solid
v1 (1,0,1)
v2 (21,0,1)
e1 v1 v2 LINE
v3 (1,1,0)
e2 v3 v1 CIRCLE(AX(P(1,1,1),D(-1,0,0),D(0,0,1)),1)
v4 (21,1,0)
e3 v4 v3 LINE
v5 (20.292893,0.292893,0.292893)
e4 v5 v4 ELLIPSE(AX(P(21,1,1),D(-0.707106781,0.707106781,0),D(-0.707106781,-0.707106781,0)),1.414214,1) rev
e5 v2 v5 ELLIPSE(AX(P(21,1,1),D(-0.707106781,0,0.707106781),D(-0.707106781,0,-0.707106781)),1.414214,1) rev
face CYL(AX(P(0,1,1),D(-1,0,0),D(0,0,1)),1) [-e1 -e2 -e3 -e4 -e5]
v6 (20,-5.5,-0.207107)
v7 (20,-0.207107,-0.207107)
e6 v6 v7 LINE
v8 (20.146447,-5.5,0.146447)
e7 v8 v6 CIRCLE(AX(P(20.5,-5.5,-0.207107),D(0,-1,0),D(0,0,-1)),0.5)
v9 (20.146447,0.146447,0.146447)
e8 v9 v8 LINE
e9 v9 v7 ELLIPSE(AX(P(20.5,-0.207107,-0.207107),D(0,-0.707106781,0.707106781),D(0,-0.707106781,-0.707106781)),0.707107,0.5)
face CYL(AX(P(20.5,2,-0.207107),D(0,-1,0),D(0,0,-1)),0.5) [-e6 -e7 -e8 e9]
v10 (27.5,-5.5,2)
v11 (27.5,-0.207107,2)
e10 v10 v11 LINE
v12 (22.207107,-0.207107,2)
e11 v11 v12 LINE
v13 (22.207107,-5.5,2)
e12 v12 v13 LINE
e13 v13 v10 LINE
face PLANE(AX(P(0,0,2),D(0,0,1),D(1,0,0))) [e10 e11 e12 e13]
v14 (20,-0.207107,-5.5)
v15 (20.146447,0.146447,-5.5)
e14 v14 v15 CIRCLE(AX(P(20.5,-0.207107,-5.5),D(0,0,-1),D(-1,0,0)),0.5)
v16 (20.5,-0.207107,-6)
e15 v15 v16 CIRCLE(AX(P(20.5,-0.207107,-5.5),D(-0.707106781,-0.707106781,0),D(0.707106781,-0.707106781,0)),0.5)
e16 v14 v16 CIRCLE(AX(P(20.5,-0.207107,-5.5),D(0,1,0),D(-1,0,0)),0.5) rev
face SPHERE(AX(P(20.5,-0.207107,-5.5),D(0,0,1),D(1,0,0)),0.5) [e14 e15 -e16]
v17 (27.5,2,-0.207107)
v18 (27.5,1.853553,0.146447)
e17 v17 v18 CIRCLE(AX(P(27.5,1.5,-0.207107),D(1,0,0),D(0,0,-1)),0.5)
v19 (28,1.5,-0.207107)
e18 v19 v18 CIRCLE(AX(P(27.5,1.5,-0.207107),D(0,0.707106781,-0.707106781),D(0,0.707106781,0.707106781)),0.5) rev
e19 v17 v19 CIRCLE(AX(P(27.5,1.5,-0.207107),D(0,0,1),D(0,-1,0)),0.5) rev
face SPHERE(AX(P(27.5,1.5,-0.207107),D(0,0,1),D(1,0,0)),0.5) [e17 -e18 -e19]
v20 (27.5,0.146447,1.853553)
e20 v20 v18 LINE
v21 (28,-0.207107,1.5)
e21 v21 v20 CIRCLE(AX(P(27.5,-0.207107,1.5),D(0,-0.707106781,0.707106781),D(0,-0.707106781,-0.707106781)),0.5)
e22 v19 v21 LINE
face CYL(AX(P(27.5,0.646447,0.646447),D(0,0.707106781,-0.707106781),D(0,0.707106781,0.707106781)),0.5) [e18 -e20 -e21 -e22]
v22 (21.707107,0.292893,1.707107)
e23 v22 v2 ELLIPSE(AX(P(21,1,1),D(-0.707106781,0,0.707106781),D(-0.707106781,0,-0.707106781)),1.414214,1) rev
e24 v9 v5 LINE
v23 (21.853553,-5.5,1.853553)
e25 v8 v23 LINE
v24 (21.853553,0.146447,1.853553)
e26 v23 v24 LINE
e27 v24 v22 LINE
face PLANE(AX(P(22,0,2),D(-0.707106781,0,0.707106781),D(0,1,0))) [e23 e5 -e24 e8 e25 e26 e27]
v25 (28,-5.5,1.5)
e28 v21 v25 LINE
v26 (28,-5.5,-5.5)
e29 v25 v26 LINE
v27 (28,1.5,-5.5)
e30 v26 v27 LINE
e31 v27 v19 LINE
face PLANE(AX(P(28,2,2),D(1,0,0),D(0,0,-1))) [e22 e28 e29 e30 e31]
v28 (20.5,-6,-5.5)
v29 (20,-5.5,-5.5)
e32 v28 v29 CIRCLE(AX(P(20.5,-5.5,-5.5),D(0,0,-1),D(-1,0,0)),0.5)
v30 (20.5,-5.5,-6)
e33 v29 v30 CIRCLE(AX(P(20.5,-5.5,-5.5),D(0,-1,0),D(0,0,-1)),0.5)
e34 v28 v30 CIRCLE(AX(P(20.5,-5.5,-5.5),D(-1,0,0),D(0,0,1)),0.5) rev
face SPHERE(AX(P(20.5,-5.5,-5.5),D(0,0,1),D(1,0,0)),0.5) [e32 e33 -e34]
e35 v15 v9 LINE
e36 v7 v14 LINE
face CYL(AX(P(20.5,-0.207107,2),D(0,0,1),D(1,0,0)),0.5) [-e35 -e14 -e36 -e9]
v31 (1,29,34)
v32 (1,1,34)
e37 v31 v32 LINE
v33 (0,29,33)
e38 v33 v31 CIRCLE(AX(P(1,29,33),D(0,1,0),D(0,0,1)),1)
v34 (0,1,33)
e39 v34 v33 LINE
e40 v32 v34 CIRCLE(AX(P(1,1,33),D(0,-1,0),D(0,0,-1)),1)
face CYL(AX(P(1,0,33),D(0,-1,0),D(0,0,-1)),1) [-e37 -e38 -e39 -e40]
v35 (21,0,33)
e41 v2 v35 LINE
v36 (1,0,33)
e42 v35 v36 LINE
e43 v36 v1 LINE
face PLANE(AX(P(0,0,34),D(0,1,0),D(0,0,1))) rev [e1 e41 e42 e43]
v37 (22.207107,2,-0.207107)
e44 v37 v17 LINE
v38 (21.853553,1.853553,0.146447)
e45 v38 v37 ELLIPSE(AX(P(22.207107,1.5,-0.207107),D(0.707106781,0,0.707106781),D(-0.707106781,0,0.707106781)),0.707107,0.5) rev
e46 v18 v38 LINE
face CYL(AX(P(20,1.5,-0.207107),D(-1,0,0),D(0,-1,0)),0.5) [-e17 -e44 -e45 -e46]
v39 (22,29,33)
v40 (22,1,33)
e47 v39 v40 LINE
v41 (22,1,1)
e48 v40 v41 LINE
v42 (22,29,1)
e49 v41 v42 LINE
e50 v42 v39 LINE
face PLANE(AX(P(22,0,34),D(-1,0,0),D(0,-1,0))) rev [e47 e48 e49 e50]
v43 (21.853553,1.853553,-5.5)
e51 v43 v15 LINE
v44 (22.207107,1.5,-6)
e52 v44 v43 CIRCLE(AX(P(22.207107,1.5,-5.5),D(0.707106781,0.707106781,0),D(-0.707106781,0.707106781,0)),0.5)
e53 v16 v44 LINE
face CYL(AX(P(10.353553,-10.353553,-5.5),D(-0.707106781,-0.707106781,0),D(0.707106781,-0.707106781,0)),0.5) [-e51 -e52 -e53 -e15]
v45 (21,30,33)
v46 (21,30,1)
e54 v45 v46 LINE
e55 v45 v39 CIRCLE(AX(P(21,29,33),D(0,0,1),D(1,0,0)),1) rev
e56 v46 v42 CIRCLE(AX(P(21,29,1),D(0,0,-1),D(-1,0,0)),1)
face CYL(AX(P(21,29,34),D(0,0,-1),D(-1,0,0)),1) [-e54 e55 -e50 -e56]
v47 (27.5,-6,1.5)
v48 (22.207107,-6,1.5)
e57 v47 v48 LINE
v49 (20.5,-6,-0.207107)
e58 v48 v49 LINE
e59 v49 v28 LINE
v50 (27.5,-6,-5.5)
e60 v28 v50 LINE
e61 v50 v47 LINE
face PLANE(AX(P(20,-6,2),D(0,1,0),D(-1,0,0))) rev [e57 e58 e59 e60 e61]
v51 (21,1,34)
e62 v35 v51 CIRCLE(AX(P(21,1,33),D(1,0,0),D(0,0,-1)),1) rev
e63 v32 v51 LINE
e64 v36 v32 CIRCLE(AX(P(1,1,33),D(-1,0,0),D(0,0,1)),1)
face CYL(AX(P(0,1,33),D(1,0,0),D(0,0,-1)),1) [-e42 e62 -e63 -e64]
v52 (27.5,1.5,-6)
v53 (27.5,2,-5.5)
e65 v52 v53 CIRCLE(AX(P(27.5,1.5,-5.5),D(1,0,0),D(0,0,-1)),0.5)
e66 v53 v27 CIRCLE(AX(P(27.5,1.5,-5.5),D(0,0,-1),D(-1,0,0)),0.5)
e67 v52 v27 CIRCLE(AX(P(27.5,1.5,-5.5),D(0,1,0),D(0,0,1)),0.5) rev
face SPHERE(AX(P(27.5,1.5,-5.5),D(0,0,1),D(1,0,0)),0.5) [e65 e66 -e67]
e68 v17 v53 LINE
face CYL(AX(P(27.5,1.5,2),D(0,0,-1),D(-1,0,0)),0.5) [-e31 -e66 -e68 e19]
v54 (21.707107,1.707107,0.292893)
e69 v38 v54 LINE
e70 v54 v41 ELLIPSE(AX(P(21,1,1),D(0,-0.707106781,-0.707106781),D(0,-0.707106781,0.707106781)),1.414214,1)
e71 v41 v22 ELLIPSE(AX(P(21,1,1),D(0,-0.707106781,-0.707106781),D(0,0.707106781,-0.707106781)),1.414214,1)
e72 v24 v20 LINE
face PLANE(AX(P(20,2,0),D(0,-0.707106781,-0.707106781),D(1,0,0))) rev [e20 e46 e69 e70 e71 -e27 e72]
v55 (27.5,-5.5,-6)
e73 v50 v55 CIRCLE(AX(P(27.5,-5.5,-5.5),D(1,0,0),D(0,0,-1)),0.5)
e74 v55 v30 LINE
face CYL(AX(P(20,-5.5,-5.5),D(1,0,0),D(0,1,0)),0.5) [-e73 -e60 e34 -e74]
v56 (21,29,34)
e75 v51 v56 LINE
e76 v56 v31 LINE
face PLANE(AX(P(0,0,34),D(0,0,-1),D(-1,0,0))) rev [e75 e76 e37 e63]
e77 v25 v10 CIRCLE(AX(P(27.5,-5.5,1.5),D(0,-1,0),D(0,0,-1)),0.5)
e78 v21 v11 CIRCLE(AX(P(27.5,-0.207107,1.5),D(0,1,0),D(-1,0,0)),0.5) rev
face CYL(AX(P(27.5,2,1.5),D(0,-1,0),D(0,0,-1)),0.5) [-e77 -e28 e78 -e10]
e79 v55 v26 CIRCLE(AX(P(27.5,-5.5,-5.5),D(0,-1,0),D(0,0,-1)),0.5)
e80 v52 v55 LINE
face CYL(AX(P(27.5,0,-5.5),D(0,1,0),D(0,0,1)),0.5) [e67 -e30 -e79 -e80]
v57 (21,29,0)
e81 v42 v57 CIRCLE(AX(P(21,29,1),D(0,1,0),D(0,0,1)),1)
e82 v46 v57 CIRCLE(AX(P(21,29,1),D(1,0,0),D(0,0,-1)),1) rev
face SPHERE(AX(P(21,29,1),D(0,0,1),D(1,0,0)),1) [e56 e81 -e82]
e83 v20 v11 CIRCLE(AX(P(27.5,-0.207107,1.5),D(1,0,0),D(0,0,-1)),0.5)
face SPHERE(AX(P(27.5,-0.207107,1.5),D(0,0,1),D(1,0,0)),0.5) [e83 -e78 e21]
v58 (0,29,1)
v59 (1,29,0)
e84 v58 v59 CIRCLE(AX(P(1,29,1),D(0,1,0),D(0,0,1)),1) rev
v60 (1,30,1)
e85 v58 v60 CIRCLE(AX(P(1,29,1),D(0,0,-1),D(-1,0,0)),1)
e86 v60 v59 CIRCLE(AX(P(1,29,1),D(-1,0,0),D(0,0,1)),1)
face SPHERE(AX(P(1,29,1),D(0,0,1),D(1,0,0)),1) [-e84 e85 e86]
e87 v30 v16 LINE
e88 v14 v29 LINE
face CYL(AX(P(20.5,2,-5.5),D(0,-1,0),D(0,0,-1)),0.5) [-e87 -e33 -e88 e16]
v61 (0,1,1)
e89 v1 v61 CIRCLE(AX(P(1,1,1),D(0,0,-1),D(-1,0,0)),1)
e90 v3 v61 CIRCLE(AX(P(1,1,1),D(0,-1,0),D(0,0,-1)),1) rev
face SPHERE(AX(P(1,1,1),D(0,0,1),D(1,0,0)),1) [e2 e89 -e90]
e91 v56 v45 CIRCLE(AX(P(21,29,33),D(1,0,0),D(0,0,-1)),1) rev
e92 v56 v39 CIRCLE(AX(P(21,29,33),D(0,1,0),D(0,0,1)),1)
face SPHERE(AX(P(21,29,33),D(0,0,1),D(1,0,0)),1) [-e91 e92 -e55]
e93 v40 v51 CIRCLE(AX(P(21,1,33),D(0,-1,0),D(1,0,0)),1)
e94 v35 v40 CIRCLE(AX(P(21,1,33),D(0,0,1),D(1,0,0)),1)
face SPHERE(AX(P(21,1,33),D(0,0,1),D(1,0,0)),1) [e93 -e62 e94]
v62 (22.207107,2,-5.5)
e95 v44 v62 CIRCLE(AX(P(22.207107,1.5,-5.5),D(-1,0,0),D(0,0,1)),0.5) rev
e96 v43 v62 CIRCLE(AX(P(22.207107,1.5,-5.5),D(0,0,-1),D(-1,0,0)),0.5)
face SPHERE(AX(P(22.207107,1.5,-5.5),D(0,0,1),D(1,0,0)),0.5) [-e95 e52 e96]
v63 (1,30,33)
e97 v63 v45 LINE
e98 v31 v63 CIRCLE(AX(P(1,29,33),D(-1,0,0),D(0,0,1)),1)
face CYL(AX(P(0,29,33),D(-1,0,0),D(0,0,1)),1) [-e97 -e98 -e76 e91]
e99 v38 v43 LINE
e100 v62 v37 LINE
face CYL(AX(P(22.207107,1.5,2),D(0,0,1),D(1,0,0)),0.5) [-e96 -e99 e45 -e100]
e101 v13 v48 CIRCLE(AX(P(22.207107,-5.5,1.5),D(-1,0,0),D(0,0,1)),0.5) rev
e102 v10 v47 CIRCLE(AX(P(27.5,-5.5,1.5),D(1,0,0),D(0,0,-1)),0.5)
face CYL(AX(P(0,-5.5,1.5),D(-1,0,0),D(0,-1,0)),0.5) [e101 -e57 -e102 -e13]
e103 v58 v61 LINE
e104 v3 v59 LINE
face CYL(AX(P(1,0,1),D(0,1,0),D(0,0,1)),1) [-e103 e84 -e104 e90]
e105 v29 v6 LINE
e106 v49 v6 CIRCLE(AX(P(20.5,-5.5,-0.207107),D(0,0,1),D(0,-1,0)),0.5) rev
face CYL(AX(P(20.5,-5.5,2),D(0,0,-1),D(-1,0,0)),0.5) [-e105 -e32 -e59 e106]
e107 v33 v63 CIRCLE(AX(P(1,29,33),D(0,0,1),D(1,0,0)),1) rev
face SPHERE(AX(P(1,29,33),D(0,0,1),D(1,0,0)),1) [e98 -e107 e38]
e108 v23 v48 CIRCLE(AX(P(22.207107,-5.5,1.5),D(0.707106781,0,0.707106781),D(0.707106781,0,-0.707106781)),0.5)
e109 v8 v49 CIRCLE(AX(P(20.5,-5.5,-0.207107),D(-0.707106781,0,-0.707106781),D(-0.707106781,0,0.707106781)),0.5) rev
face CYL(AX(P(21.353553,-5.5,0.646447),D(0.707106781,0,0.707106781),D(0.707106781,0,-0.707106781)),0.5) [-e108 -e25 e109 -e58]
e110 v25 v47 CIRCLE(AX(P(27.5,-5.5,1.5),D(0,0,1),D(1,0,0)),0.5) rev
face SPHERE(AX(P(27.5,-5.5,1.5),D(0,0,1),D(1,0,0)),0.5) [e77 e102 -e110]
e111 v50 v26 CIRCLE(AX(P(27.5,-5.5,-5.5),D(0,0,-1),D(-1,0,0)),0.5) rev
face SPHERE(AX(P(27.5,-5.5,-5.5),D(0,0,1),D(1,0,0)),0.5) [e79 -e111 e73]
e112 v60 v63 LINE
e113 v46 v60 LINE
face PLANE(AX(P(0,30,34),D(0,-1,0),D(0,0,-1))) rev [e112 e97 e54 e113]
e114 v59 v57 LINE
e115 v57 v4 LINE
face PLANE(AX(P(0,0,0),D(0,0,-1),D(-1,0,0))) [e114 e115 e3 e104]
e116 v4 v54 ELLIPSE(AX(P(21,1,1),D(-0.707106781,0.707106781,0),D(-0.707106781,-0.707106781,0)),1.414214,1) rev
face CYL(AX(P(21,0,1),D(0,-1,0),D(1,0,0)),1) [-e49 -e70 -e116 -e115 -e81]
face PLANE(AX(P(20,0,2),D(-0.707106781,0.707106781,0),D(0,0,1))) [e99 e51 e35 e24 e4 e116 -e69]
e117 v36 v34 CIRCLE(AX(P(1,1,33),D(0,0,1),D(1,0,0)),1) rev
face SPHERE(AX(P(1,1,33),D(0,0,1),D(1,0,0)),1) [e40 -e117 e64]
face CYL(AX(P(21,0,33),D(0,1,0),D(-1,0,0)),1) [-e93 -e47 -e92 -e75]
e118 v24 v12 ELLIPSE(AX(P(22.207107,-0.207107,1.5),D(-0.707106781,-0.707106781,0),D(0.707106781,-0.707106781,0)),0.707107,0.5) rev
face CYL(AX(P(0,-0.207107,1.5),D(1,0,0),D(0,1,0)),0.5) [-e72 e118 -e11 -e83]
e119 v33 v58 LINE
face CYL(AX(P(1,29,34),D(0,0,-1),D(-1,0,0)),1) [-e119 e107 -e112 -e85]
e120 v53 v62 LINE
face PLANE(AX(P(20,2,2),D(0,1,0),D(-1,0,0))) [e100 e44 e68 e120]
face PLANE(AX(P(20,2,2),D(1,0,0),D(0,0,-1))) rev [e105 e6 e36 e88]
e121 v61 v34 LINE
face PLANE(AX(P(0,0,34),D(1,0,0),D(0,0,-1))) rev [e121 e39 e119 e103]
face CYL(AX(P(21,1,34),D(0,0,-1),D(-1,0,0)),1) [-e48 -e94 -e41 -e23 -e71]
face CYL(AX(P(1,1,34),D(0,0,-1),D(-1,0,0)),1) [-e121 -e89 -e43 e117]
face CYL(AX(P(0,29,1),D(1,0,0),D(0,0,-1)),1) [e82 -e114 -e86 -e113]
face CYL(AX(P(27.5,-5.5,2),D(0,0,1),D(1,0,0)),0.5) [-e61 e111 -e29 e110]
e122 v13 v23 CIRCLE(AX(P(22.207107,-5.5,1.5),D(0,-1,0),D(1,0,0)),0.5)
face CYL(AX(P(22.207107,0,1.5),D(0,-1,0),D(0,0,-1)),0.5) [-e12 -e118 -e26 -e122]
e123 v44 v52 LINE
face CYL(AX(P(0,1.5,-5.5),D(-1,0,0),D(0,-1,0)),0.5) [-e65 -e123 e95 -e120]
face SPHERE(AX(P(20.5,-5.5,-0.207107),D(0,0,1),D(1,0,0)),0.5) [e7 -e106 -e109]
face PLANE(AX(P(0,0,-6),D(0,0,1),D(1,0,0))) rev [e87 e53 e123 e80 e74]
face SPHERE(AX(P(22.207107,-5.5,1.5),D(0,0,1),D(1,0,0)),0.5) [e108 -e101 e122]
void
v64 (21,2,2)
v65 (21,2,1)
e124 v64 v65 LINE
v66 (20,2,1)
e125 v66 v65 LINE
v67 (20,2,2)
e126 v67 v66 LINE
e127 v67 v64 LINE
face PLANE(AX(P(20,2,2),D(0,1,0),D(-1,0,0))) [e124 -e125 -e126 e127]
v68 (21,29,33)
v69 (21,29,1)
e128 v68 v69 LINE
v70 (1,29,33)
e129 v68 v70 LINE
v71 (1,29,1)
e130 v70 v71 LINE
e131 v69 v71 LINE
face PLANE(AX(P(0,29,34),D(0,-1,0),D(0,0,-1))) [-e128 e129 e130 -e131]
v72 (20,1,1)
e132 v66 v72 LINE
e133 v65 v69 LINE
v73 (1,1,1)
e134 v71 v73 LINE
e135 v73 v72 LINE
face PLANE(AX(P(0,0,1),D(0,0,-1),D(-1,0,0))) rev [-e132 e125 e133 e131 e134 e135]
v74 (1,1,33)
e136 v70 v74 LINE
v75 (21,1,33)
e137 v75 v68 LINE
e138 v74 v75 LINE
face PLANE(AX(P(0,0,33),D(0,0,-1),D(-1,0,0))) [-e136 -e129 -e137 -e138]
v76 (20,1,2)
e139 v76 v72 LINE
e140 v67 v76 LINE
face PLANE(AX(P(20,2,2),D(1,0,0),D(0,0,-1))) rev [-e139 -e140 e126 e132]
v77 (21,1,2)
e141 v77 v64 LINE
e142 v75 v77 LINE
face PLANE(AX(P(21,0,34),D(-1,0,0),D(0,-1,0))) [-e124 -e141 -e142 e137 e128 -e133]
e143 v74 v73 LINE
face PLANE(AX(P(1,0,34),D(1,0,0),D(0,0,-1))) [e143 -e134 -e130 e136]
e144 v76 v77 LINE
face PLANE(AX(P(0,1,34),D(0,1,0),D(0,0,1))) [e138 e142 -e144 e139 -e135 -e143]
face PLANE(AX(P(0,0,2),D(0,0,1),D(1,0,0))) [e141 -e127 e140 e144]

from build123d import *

# Parameters (mm, degrees)
SKETCH1_W                = 22
SKETCH1_H                = 30
BOSS_EXTRUDE1_DEPTH      = 34
SHELL1_T                 = 1
BOSS_EXTRUDE3_DEPTH      = 6
BOSS_EXTRUDE3_DEPTH_BACK = 2
SKETCH2_W                = 8
SKETCH2_H                = 8
CHAMFER2_SIZE            = 2
FILLET1_R                = 1
FILLET2_R                = 0.5


with BuildPart() as part:
    # Sketch1 → Boss-Extrude1 (new body)
    with BuildSketch(Plane.XY):
        with Locations((11, 15)):
            Rectangle(SKETCH1_W, SKETCH1_H)
    extrude(amount=BOSS_EXTRUDE1_DEPTH)

    # Shell1 (no face opened: a closed hollow body)
    add(offset(amount=-SHELL1_T, mode=Mode.PRIVATE), mode=Mode.SUBTRACT)

    # Sketch2 → Boss-Extrude3 (add, two sides: drawn at the far end of the back side and taken through both)
    with BuildSketch(Plane(origin=(0, 0, 0), x_dir=(-1, 0, 0), z_dir=(0, 0, -1)).offset(-BOSS_EXTRUDE3_DEPTH_BACK)):
        with Locations((-24, -2)):
            Rectangle(SKETCH2_W, SKETCH2_H)
    extrude(amount=BOSS_EXTRUDE3_DEPTH + BOSS_EXTRUDE3_DEPTH_BACK)

    # Chamfer2
    chamfer2_edges = [part.edges().sort_by_distance(p)[0] for p in [
        (20, -3, 2),
        (20, 2, -3),
        (25, 2, 2),
    ]]
    chamfer(chamfer2_edges, length=CHAMFER2_SIZE)

    # Fillet1
    # the kernel refuses this fillet: 1 mm, written as the material it takes off along each edge
    with BuildSketch(Plane(origin=(1, 29, 1), x_dir=(0, 1, 0), z_dir=(0, 0, -1))) as fillet1_piece_1_section:
        Polygon((0, 0), (FILLET1_R, 0), (FILLET1_R, -FILLET1_R), (0, -FILLET1_R), align=None)
    fillet1_piece_1 = extrude(amount=FILLET1_R, mode=Mode.PRIVATE)
    fillet1_piece_1 = fillet1_piece_1 - Plane(origin=(1, 29, 1), x_dir=(0.7071067811865475, -0.7071067811865475, 0), z_dir=(0, 0, -1)) * Sphere(FILLET1_R, mode=Mode.PRIVATE)
    add(fillet1_piece_1, mode=Mode.SUBTRACT)
    with BuildSketch(Plane(origin=(1, 1, 1), x_dir=(0, 0, -1), z_dir=(0, -1, 0))) as fillet1_piece_2_section:
        Polygon((0, 0), (FILLET1_R, 0), (FILLET1_R, -FILLET1_R), (0, -FILLET1_R), align=None)
    fillet1_piece_2 = extrude(amount=FILLET1_R, mode=Mode.PRIVATE)
    fillet1_piece_2 = fillet1_piece_2 - Plane(origin=(1, 1, 1), x_dir=(0.7071067811865475, 0, 0.7071067811865475), z_dir=(0, -1, 0)) * Sphere(FILLET1_R, mode=Mode.PRIVATE)
    add(fillet1_piece_2, mode=Mode.SUBTRACT)
    with BuildSketch(Plane(origin=(21, 29, 1), x_dir=(0, 0, -1), z_dir=(0, 1, 0))) as fillet1_piece_3_section:
        Polygon((0, 0), (FILLET1_R, 0), (FILLET1_R, -FILLET1_R), (0, -FILLET1_R), align=None)
    fillet1_piece_3 = extrude(amount=FILLET1_R, mode=Mode.PRIVATE)
    fillet1_piece_3 = fillet1_piece_3 - Plane(origin=(21, 29, 1), x_dir=(-0.7071067811865475, 0, 0.7071067811865475), z_dir=(0, 1, 0)) * Sphere(FILLET1_R, mode=Mode.PRIVATE)
    add(fillet1_piece_3, mode=Mode.SUBTRACT)
    with BuildSketch(Plane(origin=(1, 1, 33), x_dir=(-1, 0, 0), z_dir=(0, -1, 0))) as fillet1_piece_4_section:
        Polygon((0, 0), (FILLET1_R, 0), (FILLET1_R, -FILLET1_R), (0, -FILLET1_R), align=None)
    fillet1_piece_4 = extrude(amount=FILLET1_R, mode=Mode.PRIVATE)
    fillet1_piece_4 = fillet1_piece_4 - Plane(origin=(1, 1, 33), x_dir=(0.7071067811865475, 0, -0.7071067811865475), z_dir=(0, -1, 0)) * Sphere(FILLET1_R, mode=Mode.PRIVATE)
    add(fillet1_piece_4, mode=Mode.SUBTRACT)
    with BuildSketch(Plane(origin=(21, 1, 33), x_dir=(1, 0, 0), z_dir=(0, -1, 0))) as fillet1_piece_5_section:
        Polygon((0, 0), (FILLET1_R, 0), (FILLET1_R, FILLET1_R), (0, FILLET1_R), align=None)
    fillet1_piece_5 = extrude(amount=FILLET1_R, mode=Mode.PRIVATE)
    fillet1_piece_5 = fillet1_piece_5 - Plane(origin=(21, 1, 33), x_dir=(-0.7071067811865475, 0, -0.7071067811865475), z_dir=(0, -1, 0)) * Sphere(FILLET1_R, mode=Mode.PRIVATE)
    add(fillet1_piece_5, mode=Mode.SUBTRACT)
    with BuildSketch(Plane(origin=(21, 29, 33), x_dir=(1, 0, 0), z_dir=(0, 1, 0))) as fillet1_piece_6_section:
        Polygon((0, 0), (FILLET1_R, 0), (FILLET1_R, -FILLET1_R), (0, -FILLET1_R), align=None)
    fillet1_piece_6 = extrude(amount=FILLET1_R, mode=Mode.PRIVATE)
    fillet1_piece_6 = fillet1_piece_6 - Plane(origin=(21, 29, 33), x_dir=(-0.7071067811865475, 0, -0.7071067811865475), z_dir=(0, 1, 0)) * Sphere(FILLET1_R, mode=Mode.PRIVATE)
    add(fillet1_piece_6, mode=Mode.SUBTRACT)
    with BuildSketch(Plane(origin=(1, 29, 33), x_dir=(-1, 0, 0), z_dir=(0, 1, 0))) as fillet1_piece_7_section:
        Polygon((0, 0), (FILLET1_R, 0), (FILLET1_R, FILLET1_R), (0, FILLET1_R), align=None)
    fillet1_piece_7 = extrude(amount=FILLET1_R, mode=Mode.PRIVATE)
    fillet1_piece_7 = fillet1_piece_7 - Plane(origin=(1, 29, 33), x_dir=(0.7071067811865475, 0, -0.7071067811865475), z_dir=(0, 1, 0)) * Sphere(FILLET1_R, mode=Mode.PRIVATE)
    add(fillet1_piece_7, mode=Mode.SUBTRACT)
    with BuildSketch(Plane(origin=(0, 29, 0), x_dir=(1, 0, 0), z_dir=(0, -1, 0)), Plane(origin=(22, 1, 34), x_dir=(0, 0, -1), z_dir=(0, 1, 0)), Plane(origin=(0, 29, 34), x_dir=(0, 0, -1), z_dir=(0, -1, 0))) as fillet1_piece_8:
        with BuildLine():
            CenterArc((FILLET1_R, FILLET1_R), FILLET1_R, 180, 90)
            Line((0, FILLET1_R), (0, 0))
            Line((0, 0), (FILLET1_R, 0))
        make_face()
    extrude(amount=28, mode=Mode.SUBTRACT)
    with BuildSketch(Plane(origin=(1, 0, 0), x_dir=(0, 0, 1), z_dir=(1, 0, 0))) as fillet1_piece_9_section:
        with BuildLine():
            CenterArc((FILLET1_R, -FILLET1_R), FILLET1_R, 90, 90)
            Line((0, -FILLET1_R), (0, 0))
            Line((0, 0), (FILLET1_R, 0))
        make_face()
    fillet1_piece_9 = extrude(amount=21.5, mode=Mode.PRIVATE)
    fillet1_piece_9 = split(fillet1_piece_9, bisect_by=Plane(origin=(15.381840504, 0.226418621, -4.618159496), z_dir=(-0.7071067811865476, 0, 0.7071067811865476)), keep=Keep.TOP, mode=Mode.PRIVATE)
    fillet1_piece_9 = split(fillet1_piece_9, bisect_by=Plane(origin=(15.381840504, -4.618159496, 0.226418621), z_dir=(-0.7071067811865475, 0.7071067811865476, 0)), keep=Keep.TOP, mode=Mode.PRIVATE)
    add(fillet1_piece_9, mode=Mode.SUBTRACT)
    with BuildSketch(Plane(origin=(1, 0, 0), x_dir=(0, 0, 1), z_dir=(1, 0, 0))) as fillet1_piece_10_section:
        with BuildLine():
            CenterArc((FILLET1_R, -FILLET1_R), FILLET1_R, 90, 90)
            Line((0, -FILLET1_R), (0, 0))
            Line((0, 0), (FILLET1_R, 0))
        make_face()
    fillet1_piece_10 = extrude(amount=21.5, mode=Mode.PRIVATE)
    fillet1_piece_10 = split(fillet1_piece_10, bisect_by=Plane(origin=(20.16446835, 0.528927527, 0.16446835), z_dir=(0.7071067811865476, 0, -0.7071067811865476)), keep=Keep.TOP, mode=Mode.PRIVATE)
    fillet1_piece_10 = split(fillet1_piece_10, bisect_by=Plane(origin=(20.407441135, 0.407441135, 0.042981958), z_dir=(-0.7071067811865475, 0.7071067811865476, 0)), keep=Keep.TOP, mode=Mode.PRIVATE)
    add(fillet1_piece_10, mode=Mode.SUBTRACT)
    with BuildSketch(Plane(origin=(1, 0, 0), x_dir=(0, 0, 1), z_dir=(1, 0, 0))) as fillet1_piece_11_section:
        with BuildLine():
            CenterArc((FILLET1_R, -FILLET1_R), FILLET1_R, 90, 90)
            Line((0, -FILLET1_R), (0, 0))
            Line((0, 0), (FILLET1_R, 0))
        make_face()
    fillet1_piece_11 = extrude(amount=21.5, mode=Mode.PRIVATE)
    fillet1_piece_11 = split(fillet1_piece_11, bisect_by=Plane(origin=(20.407441135, 0.042981958, 0.407441135), z_dir=(-0.7071067811865476, 0, 0.7071067811865476)), keep=Keep.TOP, mode=Mode.PRIVATE)
    fillet1_piece_11 = split(fillet1_piece_11, bisect_by=Plane(origin=(20.16446835, 0.16446835, 0.528927527), z_dir=(0.7071067811865475, -0.7071067811865476, 0)), keep=Keep.TOP, mode=Mode.PRIVATE)
    add(fillet1_piece_11, mode=Mode.SUBTRACT)
    with BuildSketch(Plane(origin=(22, -0.5, 0), x_dir=(-1, 0, 0), z_dir=(0, 1, 0))) as fillet1_piece_12_section:
        with BuildLine():
            CenterArc((FILLET1_R, FILLET1_R), FILLET1_R, 180, 90)
            Line((0, FILLET1_R), (0, 0))
            Line((0, 0), (FILLET1_R, 0))
        make_face()
    fillet1_piece_12 = extrude(amount=29.5, mode=Mode.PRIVATE)
    fillet1_piece_12 = split(fillet1_piece_12, bisect_by=Plane(origin=(21.83553165, 1.83553165, 0.528927527), z_dir=(0.7071067811865475, -0.7071067811865476, 0)), keep=Keep.TOP, mode=Mode.PRIVATE)
    fillet1_piece_12 = split(fillet1_piece_12, bisect_by=Plane(origin=(21.957018042, 1.592558865, 0.407441135), z_dir=(0, 0.7071067811865476, 0.7071067811865476)), keep=Keep.TOP, mode=Mode.PRIVATE)
    add(fillet1_piece_12, mode=Mode.SUBTRACT)
    with BuildSketch(Plane(origin=(22, -0.5, 0), x_dir=(-1, 0, 0), z_dir=(0, 1, 0))) as fillet1_piece_13_section:
        with BuildLine():
            CenterArc((FILLET1_R, FILLET1_R), FILLET1_R, 180, 90)
            Line((0, FILLET1_R), (0, 0))
            Line((0, 0), (FILLET1_R, 0))
        make_face()
    fillet1_piece_13 = extrude(amount=29.5, mode=Mode.PRIVATE)
    fillet1_piece_13 = split(fillet1_piece_13, bisect_by=Plane(origin=(21.592558865, 1.592558865, 0.042981958), z_dir=(-0.7071067811865475, 0.7071067811865476, 0)), keep=Keep.TOP, mode=Mode.PRIVATE)
    fillet1_piece_13 = split(fillet1_piece_13, bisect_by=Plane(origin=(21.471072473, 1.83553165, 0.16446835), z_dir=(0, -0.7071067811865476, -0.7071067811865476)), keep=Keep.TOP, mode=Mode.PRIVATE)
    add(fillet1_piece_13, mode=Mode.SUBTRACT)
    with BuildSketch(Plane(origin=(22, -0.5, 0), x_dir=(-1, 0, 0), z_dir=(0, 1, 0))) as fillet1_piece_14_section:
        with BuildLine():
            CenterArc((FILLET1_R, FILLET1_R), FILLET1_R, 180, 90)
            Line((0, FILLET1_R), (0, 0))
            Line((0, 0), (FILLET1_R, 0))
        make_face()
    fillet1_piece_14 = extrude(amount=29.5, mode=Mode.PRIVATE)
    fillet1_piece_14 = split(fillet1_piece_14, bisect_by=Plane(origin=(28.618183131, 8.618183131, 0.226411675), z_dir=(-0.7071067811865475, 0.7071067811865476, 0)), keep=Keep.TOP, mode=Mode.PRIVATE)
    fillet1_piece_14 = split(fillet1_piece_14, bisect_by=Plane(origin=(21.773588325, 8.618183131, -6.618183131), z_dir=(0, 0.7071067811865476, 0.7071067811865476)), keep=Keep.TOP, mode=Mode.PRIVATE)
    add(fillet1_piece_14, mode=Mode.SUBTRACT)
    with BuildSketch(Plane(origin=(21, 30, 0), x_dir=(0, -1, 0), z_dir=(-1, 0, 0)), Plane(origin=(1, 0, 34), x_dir=(0, 0, -1), z_dir=(1, 0, 0))) as fillet1_piece_15:
        with BuildLine():
            CenterArc((FILLET1_R, FILLET1_R), FILLET1_R, 180, 90)
            Line((0, FILLET1_R), (0, 0))
            Line((0, 0), (FILLET1_R, 0))
        make_face()
    extrude(amount=20, mode=Mode.SUBTRACT)
    with BuildSketch(Plane(origin=(21, 30, 34), x_dir=(0, -1, 0), z_dir=(-1, 0, 0))) as fillet1_piece_16:
        with BuildLine():
            CenterArc((FILLET1_R, -FILLET1_R), FILLET1_R, 90, 90)
            Line((0, -FILLET1_R), (0, 0))
            Line((0, 0), (FILLET1_R, 0))
        make_face()
    extrude(amount=20, mode=Mode.SUBTRACT)
    with BuildSketch(Plane(origin=(0, 30, 1), x_dir=(0, -1, 0), z_dir=(0, 0, 1)), Plane(origin=(0, 0, 1), x_dir=(1, 0, 0), z_dir=(0, 0, 1))) as fillet1_piece_17:
        with BuildLine():
            CenterArc((FILLET1_R, FILLET1_R), FILLET1_R, 180, 90)
            Line((0, FILLET1_R), (0, 0))
            Line((0, 0), (FILLET1_R, 0))
        make_face()
    extrude(amount=32, mode=Mode.SUBTRACT)
    with BuildSketch(Plane(origin=(22, 30, 1), x_dir=(0, -1, 0), z_dir=(0, 0, 1))) as fillet1_piece_18:
        with BuildLine():
            CenterArc((FILLET1_R, -FILLET1_R), FILLET1_R, 90, 90)
            Line((0, -FILLET1_R), (0, 0))
            Line((0, 0), (FILLET1_R, 0))
        make_face()
    extrude(amount=32, mode=Mode.SUBTRACT)
    with BuildSketch(Plane(origin=(22, 0, -0.5), x_dir=(-1, 0, 0), z_dir=(0, 0, 1))) as fillet1_piece_19_section:
        with BuildLine():
            CenterArc((FILLET1_R, -FILLET1_R), FILLET1_R, 90, 90)
            Line((0, -FILLET1_R), (0, 0))
            Line((0, 0), (FILLET1_R, 0))
        make_face()
    fillet1_piece_19 = extrude(amount=33.5, mode=Mode.PRIVATE)
    fillet1_piece_19 = split(fillet1_piece_19, bisect_by=Plane(origin=(21.83553165, 0.528927527, 1.83553165), z_dir=(0.7071067811865476, 0, -0.7071067811865476)), keep=Keep.TOP, mode=Mode.PRIVATE)
    fillet1_piece_19 = split(fillet1_piece_19, bisect_by=Plane(origin=(21.957018042, 0.407441135, 1.592558865), z_dir=(0, 0.7071067811865476, 0.7071067811865476)), keep=Keep.TOP, mode=Mode.PRIVATE)
    add(fillet1_piece_19, mode=Mode.SUBTRACT)
    with BuildSketch(Plane(origin=(22, 0, -0.5), x_dir=(-1, 0, 0), z_dir=(0, 0, 1))) as fillet1_piece_20_section:
        with BuildLine():
            CenterArc((FILLET1_R, -FILLET1_R), FILLET1_R, 90, 90)
            Line((0, -FILLET1_R), (0, 0))
            Line((0, 0), (FILLET1_R, 0))
        make_face()
    fillet1_piece_20 = extrude(amount=33.5, mode=Mode.PRIVATE)
    fillet1_piece_20 = split(fillet1_piece_20, bisect_by=Plane(origin=(21.592558865, 0.042981958, 1.592558865), z_dir=(-0.7071067811865476, 0, 0.7071067811865476)), keep=Keep.TOP, mode=Mode.PRIVATE)
    fillet1_piece_20 = split(fillet1_piece_20, bisect_by=Plane(origin=(21.471072473, 0.16446835, 1.83553165), z_dir=(0, -0.7071067811865476, -0.7071067811865476)), keep=Keep.TOP, mode=Mode.PRIVATE)
    add(fillet1_piece_20, mode=Mode.SUBTRACT)
    with BuildSketch(Plane(origin=(22, 0, -0.5), x_dir=(-1, 0, 0), z_dir=(0, 0, 1))) as fillet1_piece_21_section:
        with BuildLine():
            CenterArc((FILLET1_R, -FILLET1_R), FILLET1_R, 90, 90)
            Line((0, -FILLET1_R), (0, 0))
            Line((0, 0), (FILLET1_R, 0))
        make_face()
    fillet1_piece_21 = extrude(amount=33.5, mode=Mode.PRIVATE)
    fillet1_piece_21 = split(fillet1_piece_21, bisect_by=Plane(origin=(29.618190384, 0.226409543, 9.618190384), z_dir=(-0.7071067811865476, 0, 0.7071067811865476)), keep=Keep.TOP, mode=Mode.PRIVATE)
    fillet1_piece_21 = split(fillet1_piece_21, bisect_by=Plane(origin=(21.773590457, -7.618190384, 9.618190384), z_dir=(0, 0.7071067811865476, 0.7071067811865476)), keep=Keep.TOP, mode=Mode.PRIVATE)
    add(fillet1_piece_21, mode=Mode.SUBTRACT)

    # Fillet2
    fillet2_edges = [part.edges().sort_by_distance(p)[0] for p in [
        (24, -6, -6),
        (28, -6, -2),
        (28, -2, -6),
        (28, 2, -3),
        (25, 2, -6),
        (22, 2, -3),
        (25, 2, 0),
        (28, -3, 2),
        (28, 1, 1),
        (25, -6, 2),
        (22, -3, 2),
        (25, 0, 2),
        (20, -3, -6),
        (20, -6, -3),
        (20, -3, 0),
        (20, 0, -3),
        (21, 1, -6),
        (21, -6, 1),
    ]]
    fillet(fillet2_edges, radius=FILLET2_R)


solid = part.part
